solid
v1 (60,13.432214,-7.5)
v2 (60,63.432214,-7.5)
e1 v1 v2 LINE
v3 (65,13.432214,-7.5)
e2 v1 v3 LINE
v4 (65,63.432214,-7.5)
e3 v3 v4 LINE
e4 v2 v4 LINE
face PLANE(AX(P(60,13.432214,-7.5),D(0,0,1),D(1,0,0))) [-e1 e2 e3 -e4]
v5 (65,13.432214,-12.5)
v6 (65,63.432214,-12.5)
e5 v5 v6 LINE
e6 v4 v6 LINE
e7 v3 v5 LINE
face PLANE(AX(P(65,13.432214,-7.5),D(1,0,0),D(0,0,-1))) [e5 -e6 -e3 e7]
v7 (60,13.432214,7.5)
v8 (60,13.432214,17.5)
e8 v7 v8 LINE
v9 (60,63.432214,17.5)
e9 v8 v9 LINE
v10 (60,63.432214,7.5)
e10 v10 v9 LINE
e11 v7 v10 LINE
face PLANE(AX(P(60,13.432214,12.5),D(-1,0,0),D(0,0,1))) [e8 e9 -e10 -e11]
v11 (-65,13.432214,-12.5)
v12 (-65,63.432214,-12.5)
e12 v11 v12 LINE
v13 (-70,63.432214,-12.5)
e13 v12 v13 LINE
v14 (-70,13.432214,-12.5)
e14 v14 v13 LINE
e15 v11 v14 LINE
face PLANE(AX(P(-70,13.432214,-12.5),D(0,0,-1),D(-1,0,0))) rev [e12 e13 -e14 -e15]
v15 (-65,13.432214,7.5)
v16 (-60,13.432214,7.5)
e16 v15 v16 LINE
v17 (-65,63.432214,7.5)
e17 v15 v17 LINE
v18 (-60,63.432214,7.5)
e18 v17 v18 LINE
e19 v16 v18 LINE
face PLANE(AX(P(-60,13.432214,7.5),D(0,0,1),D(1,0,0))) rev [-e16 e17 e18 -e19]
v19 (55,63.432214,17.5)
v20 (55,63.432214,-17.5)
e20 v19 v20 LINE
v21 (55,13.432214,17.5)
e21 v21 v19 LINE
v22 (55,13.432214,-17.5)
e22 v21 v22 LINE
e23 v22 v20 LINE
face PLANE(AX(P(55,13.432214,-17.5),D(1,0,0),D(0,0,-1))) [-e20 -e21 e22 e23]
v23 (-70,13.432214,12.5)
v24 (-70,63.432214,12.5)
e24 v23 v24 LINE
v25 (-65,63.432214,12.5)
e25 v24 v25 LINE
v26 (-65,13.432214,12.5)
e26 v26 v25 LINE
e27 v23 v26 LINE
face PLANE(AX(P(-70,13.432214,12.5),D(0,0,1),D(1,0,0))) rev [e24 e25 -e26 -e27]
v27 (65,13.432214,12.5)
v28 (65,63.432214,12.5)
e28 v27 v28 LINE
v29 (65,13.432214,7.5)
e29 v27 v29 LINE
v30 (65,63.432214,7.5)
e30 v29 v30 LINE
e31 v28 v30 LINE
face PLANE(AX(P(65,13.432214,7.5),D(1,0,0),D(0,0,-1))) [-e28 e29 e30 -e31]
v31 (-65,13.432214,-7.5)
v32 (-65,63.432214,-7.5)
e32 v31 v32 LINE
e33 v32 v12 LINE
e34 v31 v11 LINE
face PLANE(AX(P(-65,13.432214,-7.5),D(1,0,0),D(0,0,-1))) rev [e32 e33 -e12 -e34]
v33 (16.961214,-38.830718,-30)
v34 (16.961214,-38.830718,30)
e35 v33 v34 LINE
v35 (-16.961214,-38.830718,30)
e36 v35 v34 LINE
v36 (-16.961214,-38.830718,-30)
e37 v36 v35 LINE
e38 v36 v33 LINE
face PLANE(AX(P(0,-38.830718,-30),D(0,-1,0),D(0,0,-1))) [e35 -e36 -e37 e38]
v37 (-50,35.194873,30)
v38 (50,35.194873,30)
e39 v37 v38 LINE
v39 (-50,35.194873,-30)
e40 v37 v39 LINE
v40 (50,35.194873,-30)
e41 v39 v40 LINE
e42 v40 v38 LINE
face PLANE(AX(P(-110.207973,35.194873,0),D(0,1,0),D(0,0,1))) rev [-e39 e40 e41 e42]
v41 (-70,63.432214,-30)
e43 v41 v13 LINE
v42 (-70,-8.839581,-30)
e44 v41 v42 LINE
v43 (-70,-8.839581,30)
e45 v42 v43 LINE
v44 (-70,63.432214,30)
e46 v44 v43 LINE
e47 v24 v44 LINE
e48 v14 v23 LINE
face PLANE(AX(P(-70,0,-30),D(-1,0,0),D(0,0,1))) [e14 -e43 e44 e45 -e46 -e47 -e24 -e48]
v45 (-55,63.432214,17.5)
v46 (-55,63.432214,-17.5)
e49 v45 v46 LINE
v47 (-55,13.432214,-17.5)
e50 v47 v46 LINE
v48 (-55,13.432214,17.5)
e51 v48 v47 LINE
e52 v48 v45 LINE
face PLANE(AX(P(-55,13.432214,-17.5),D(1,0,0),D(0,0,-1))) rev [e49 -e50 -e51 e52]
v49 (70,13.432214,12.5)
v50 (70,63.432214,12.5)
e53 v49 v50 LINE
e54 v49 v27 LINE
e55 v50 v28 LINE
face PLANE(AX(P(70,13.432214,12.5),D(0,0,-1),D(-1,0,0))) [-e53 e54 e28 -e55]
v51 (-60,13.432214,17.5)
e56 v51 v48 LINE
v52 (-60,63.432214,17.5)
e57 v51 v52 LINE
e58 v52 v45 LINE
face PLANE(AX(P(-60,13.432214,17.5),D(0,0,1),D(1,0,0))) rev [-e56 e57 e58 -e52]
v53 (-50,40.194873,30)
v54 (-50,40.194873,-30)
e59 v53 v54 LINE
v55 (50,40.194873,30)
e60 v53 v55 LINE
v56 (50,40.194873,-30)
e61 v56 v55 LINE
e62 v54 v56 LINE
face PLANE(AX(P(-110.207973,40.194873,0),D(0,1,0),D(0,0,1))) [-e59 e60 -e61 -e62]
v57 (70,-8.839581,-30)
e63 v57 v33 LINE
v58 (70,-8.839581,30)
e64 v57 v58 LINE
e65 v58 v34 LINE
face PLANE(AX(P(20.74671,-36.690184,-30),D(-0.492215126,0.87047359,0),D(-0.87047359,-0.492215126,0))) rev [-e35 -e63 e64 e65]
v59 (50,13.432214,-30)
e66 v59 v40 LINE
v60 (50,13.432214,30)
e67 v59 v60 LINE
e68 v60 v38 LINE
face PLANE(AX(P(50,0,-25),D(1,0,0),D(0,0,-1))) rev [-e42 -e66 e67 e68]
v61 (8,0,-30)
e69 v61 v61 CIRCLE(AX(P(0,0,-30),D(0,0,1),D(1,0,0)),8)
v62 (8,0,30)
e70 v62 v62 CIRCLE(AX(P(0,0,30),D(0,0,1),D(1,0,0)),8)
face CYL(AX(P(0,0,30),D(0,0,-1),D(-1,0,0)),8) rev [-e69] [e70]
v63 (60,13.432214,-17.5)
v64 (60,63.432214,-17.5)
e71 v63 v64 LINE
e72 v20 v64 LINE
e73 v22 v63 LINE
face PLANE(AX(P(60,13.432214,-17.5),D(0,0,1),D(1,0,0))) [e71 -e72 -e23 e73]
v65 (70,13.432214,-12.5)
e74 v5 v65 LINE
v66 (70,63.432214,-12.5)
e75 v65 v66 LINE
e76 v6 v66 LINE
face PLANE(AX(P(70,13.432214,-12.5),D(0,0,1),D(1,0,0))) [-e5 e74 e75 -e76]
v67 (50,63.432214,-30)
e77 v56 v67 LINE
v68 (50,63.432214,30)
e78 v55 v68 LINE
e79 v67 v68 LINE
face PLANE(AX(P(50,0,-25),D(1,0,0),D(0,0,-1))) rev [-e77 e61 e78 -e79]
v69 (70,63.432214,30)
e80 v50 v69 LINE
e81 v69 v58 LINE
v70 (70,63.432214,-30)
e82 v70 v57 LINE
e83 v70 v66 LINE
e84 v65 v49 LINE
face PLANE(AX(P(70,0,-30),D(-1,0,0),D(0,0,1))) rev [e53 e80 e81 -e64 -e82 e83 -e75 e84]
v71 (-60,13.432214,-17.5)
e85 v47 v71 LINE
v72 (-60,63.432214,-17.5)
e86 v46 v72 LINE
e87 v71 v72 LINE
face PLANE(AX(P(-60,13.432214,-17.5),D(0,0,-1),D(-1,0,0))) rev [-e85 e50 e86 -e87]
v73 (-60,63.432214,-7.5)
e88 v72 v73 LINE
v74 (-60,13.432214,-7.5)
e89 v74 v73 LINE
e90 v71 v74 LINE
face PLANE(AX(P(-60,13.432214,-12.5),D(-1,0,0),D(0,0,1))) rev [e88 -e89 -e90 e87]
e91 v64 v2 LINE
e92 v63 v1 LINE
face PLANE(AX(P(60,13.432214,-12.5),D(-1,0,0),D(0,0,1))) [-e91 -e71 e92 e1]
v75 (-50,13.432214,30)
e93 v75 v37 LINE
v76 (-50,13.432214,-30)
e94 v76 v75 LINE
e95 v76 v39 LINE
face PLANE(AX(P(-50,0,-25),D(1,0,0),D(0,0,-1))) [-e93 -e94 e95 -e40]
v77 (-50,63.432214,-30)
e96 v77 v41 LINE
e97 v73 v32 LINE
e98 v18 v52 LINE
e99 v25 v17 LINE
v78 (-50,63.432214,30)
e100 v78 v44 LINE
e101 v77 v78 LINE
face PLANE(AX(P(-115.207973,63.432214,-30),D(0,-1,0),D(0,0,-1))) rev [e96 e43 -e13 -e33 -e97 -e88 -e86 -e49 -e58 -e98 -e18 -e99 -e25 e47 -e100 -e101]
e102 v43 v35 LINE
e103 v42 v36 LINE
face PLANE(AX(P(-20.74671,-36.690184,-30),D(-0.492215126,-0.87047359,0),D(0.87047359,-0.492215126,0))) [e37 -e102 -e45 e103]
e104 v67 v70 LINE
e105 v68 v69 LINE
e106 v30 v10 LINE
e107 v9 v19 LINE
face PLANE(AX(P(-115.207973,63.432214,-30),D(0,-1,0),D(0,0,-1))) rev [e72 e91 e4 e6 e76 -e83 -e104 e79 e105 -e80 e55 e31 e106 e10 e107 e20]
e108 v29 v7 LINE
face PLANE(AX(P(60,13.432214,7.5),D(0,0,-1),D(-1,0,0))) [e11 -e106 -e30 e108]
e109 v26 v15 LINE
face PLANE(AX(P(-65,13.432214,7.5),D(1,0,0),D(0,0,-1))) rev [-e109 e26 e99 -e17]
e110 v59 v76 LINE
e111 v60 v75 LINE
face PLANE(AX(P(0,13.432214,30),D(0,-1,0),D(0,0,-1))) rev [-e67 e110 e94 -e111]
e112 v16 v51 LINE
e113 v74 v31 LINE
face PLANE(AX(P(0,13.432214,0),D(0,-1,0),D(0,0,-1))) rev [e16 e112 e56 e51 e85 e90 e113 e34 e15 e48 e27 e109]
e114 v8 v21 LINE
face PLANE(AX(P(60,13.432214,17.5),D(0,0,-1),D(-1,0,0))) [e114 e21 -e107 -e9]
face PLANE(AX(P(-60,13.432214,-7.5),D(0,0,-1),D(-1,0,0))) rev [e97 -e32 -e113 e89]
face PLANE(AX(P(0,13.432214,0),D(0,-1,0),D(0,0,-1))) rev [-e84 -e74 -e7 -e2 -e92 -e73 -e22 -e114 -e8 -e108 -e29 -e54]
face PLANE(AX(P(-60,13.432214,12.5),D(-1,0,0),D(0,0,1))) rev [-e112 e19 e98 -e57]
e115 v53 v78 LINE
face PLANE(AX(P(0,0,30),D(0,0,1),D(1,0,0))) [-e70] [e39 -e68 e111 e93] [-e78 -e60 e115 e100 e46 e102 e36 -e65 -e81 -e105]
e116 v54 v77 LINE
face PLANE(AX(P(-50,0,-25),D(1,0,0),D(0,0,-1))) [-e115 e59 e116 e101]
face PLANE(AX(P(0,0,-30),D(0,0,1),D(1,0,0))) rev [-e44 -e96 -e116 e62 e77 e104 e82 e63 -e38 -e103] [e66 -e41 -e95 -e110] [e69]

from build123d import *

# Parameters (mm, degrees)
BOSS_EXTRUDE2_DEPTH            = 30
BOSS_EXTRUDE2_DEPTH_BACK       = 30
EXTRUDE_THIN2_START            = -25
EXTRUDE_THIN2_DEPTH            = 50
SKETCH2_W                      = 60
SKETCH2_H                      = 5
BOSS_EXTRUDE3_DEPTH            = 100
BOSS_EXTRUDE4_DEPTH            = 30
BOSS_EXTRUDE4_DEPTH_BACK       = 30
CUT_EXTRUDE2_REACH             = 143.361
SKETCH4_W                      = 60
SKETCH4_H                      = 5
CUT_EXTRUDE2_DIRECTION_2_REACH = 143.361
BOSS_EXTRUDE5_DEPTH            = 30
BOSS_EXTRUDE5_DEPTH_BACK       = 30
DRONE_ARM_FIT_CUT_DEPTH        = 50


# Read off the part's stored shape, not the designer's step: Extrude-Thin2
with BuildPart() as part:
    # Sketch1 → Boss-Extrude2 (new, two sides: drawn at the far end of the back side and taken through both)
    with BuildSketch(Plane.XY.offset(-BOSS_EXTRUDE2_DEPTH_BACK)):
        Polygon((-13.01396445, -23.830717844), (0, -23.830717844), (0, -18.830717844), (-11.698214449, -18.830717844), (-50, 2.827283512), (-50, 13.432214294), (-55, 13.432214294), (-55, -0.089432632), align=None)
        Polygon((0, -18.830717844), (0, -23.830717844), (13.01396445, -23.830717844), (55, -0.089432632), (55, 13.432214294), (50, 13.432214294), (50, 2.827283512), (11.698214449, -18.830717844), align=None)
        with BuildLine():
            Line((-11.698214449, -18.830717844), (0, -18.830717844))
            Line((0, -18.830717844), (0, -8))
            ThreePointArc((0, -8), (-8, 0), (0, 8))
            Line((0, 8), (0, 13.432214294))
            Line((0, 13.432214294), (-50, 13.432214294))
            Line((-50, 13.432214294), (-50, 2.827283512))
            Line((-50, 2.827283512), (-11.698214449, -18.830717844))
        make_face()
        with BuildLine():
            Line((0, -8), (0, -18.830717844))
            Line((0, -18.830717844), (11.698214449, -18.830717844))
            Line((11.698214449, -18.830717844), (50, 2.827283512))
            Line((50, 2.827283512), (50, 13.432214294))
            Line((50, 13.432214294), (0, 13.432214294))
            Line((0, 13.432214294), (0, 8))
            ThreePointArc((0, 8), (5.656854249, 5.656854249), (8, 0))
            ThreePointArc((8, 0), (5.656854249, -5.656854249), (0, -8))
        make_face()
    extrude(amount=BOSS_EXTRUDE2_DEPTH + BOSS_EXTRUDE2_DEPTH_BACK)

    # Extrude-Thin2 outline → Extrude-Thin2 (add)
    with BuildSketch(Plane.XY.offset(EXTRUDE_THIN2_START)):
        Polygon((50, 13.432214294), (55, 13.432214294), (55, 68.432214294), (-55, 68.432214294), (-55, 13.432214294), (-50, 13.432214294), (-50, 63.432214294), (50, 63.432214294), align=None)
    extrude(amount=EXTRUDE_THIN2_DEPTH)

    # Sketch2 → Boss-Extrude3 (add)
    with BuildSketch(Plane.ZY.offset(-50)):
        with Locations((0, 37.694873029)):
            Rectangle(SKETCH2_W, SKETCH2_H)
    extrude(amount=BOSS_EXTRUDE3_DEPTH)

    # Sketch1<6> → Boss-Extrude4 (add, two sides: drawn at the far end of the back side and taken through both)
    with BuildSketch(Plane.XY.offset(-BOSS_EXTRUDE4_DEPTH_BACK)):
        Polygon((-55, -0.089432632), (-55, 13.432214294), (-70, 13.432214294), (-70, -8.839581066), (-16.961214453, -38.830717844), (16.961214453, -38.830717844), (70, -8.839581066), (70, 13.432214294), (55, 13.432214294), (55, -0.089432632), (13.01396445, -23.830717844), (-13.01396445, -23.830717844), align=None)
    extrude(amount=BOSS_EXTRUDE4_DEPTH + BOSS_EXTRUDE4_DEPTH_BACK)

    # Cut-Extrude2: up to this face of the body (flat: up to its plane)
    cut_extrude2_end = Plane(part.part.faces().sort_by_distance((-55, 40.932214294, 0))[0])
    # Sketch4 → Cut-Extrude2 (cut, up to the picked face)
    with BuildSketch(Plane(origin=(-50, 0, 0), x_dir=(0, 0, -1), z_dir=(1, 0, 0)), mode=Mode.PRIVATE) as cut_extrude2_sk1:
        with Locations((0, 65.932214294)):
            Rectangle(SKETCH4_W, SKETCH4_H)
    cut_extrude2_tool1 = split(extrude(cut_extrude2_sk1.sketch, amount=-CUT_EXTRUDE2_REACH, mode=Mode.PRIVATE), bisect_by=cut_extrude2_end, keep=Keep.BOTH, mode=Mode.PRIVATE)
    add(cut_extrude2_tool1.solids().sort_by(Axis((-50, 65.932214, 0), (-1, 0, 0)))[0], mode=Mode.SUBTRACT)

    # Cut-Extrude2 direction 2: up to this face of the body (flat: up to its plane)
    cut_extrude2_direction_2_end = Plane(part.part.faces().sort_by_distance((55, 40.932214294, 0))[0])
    # Sketch4 → Cut-Extrude2 direction 2 (cut, up to the picked face)
    with BuildSketch(Plane(origin=(-50, 0, 0), x_dir=(0, 0, -1), z_dir=(1, 0, 0)), mode=Mode.PRIVATE) as cut_extrude2_direction_2_sk1:
        with Locations((0, 65.932214294)):
            Rectangle(SKETCH4_W, SKETCH4_H)
    cut_extrude2_direction_2_tool1 = split(extrude(cut_extrude2_direction_2_sk1.sketch, amount=CUT_EXTRUDE2_DIRECTION_2_REACH, mode=Mode.PRIVATE), bisect_by=cut_extrude2_direction_2_end, keep=Keep.BOTH, mode=Mode.PRIVATE)
    add(cut_extrude2_direction_2_tool1.solids().sort_by(Axis((-50, 65.932214, 0), (1, 0, 0)))[0], mode=Mode.SUBTRACT)

    # Sketch1<7> → Boss-Extrude5 (add, two sides: drawn at the far end of the back side and taken through both)
    with BuildSketch(Plane.XY.offset(-BOSS_EXTRUDE5_DEPTH_BACK)):
        Polygon((-70, 13.432214294), (-55, 13.432214294), (-50, 13.432214294), (-50, 38.432214294), (-50, 63.432214294), (-70, 63.432214294), (-70, 38.432214294), align=None)
        Polygon((50, 38.432214294), (50, 13.432214294), (55, 13.432214294), (70, 13.432214294), (70, 38.432214294), (70, 63.432214294), (50, 63.432214294), align=None)
    extrude(amount=BOSS_EXTRUDE5_DEPTH + BOSS_EXTRUDE5_DEPTH_BACK)

    # Sketch7 → Drone Arm fit cut (cut)
    with BuildSketch(Plane(origin=(0, 63.432214294, 0), x_dir=(1, 0, 0), z_dir=(0, 1, 0))):
        Polygon((-70, -12.5), (-70, 12.5), (-65, 12.5), (-65, 7.5), (-60, 7.5), (-60, 12.5), (-60, 17.5), (-55, 17.5), (-55, -17.5), (-60, -17.5), (-60, -12.5), (-60, -7.5), (-65, -7.5), (-65, -12.5), align=None)
    drone_arm_fit_cut = extrude(amount=-DRONE_ARM_FIT_CUT_DEPTH, mode=Mode.SUBTRACT)

    # Mirror Drone arm fit cut: Drone Arm fit cut across plane
    add(drone_arm_fit_cut.mirror(Plane(origin=(0, 0, 0), x_dir=(0, 0, 1), z_dir=(1, 0, 0))), mode=Mode.SUBTRACT)


solid = part.part
